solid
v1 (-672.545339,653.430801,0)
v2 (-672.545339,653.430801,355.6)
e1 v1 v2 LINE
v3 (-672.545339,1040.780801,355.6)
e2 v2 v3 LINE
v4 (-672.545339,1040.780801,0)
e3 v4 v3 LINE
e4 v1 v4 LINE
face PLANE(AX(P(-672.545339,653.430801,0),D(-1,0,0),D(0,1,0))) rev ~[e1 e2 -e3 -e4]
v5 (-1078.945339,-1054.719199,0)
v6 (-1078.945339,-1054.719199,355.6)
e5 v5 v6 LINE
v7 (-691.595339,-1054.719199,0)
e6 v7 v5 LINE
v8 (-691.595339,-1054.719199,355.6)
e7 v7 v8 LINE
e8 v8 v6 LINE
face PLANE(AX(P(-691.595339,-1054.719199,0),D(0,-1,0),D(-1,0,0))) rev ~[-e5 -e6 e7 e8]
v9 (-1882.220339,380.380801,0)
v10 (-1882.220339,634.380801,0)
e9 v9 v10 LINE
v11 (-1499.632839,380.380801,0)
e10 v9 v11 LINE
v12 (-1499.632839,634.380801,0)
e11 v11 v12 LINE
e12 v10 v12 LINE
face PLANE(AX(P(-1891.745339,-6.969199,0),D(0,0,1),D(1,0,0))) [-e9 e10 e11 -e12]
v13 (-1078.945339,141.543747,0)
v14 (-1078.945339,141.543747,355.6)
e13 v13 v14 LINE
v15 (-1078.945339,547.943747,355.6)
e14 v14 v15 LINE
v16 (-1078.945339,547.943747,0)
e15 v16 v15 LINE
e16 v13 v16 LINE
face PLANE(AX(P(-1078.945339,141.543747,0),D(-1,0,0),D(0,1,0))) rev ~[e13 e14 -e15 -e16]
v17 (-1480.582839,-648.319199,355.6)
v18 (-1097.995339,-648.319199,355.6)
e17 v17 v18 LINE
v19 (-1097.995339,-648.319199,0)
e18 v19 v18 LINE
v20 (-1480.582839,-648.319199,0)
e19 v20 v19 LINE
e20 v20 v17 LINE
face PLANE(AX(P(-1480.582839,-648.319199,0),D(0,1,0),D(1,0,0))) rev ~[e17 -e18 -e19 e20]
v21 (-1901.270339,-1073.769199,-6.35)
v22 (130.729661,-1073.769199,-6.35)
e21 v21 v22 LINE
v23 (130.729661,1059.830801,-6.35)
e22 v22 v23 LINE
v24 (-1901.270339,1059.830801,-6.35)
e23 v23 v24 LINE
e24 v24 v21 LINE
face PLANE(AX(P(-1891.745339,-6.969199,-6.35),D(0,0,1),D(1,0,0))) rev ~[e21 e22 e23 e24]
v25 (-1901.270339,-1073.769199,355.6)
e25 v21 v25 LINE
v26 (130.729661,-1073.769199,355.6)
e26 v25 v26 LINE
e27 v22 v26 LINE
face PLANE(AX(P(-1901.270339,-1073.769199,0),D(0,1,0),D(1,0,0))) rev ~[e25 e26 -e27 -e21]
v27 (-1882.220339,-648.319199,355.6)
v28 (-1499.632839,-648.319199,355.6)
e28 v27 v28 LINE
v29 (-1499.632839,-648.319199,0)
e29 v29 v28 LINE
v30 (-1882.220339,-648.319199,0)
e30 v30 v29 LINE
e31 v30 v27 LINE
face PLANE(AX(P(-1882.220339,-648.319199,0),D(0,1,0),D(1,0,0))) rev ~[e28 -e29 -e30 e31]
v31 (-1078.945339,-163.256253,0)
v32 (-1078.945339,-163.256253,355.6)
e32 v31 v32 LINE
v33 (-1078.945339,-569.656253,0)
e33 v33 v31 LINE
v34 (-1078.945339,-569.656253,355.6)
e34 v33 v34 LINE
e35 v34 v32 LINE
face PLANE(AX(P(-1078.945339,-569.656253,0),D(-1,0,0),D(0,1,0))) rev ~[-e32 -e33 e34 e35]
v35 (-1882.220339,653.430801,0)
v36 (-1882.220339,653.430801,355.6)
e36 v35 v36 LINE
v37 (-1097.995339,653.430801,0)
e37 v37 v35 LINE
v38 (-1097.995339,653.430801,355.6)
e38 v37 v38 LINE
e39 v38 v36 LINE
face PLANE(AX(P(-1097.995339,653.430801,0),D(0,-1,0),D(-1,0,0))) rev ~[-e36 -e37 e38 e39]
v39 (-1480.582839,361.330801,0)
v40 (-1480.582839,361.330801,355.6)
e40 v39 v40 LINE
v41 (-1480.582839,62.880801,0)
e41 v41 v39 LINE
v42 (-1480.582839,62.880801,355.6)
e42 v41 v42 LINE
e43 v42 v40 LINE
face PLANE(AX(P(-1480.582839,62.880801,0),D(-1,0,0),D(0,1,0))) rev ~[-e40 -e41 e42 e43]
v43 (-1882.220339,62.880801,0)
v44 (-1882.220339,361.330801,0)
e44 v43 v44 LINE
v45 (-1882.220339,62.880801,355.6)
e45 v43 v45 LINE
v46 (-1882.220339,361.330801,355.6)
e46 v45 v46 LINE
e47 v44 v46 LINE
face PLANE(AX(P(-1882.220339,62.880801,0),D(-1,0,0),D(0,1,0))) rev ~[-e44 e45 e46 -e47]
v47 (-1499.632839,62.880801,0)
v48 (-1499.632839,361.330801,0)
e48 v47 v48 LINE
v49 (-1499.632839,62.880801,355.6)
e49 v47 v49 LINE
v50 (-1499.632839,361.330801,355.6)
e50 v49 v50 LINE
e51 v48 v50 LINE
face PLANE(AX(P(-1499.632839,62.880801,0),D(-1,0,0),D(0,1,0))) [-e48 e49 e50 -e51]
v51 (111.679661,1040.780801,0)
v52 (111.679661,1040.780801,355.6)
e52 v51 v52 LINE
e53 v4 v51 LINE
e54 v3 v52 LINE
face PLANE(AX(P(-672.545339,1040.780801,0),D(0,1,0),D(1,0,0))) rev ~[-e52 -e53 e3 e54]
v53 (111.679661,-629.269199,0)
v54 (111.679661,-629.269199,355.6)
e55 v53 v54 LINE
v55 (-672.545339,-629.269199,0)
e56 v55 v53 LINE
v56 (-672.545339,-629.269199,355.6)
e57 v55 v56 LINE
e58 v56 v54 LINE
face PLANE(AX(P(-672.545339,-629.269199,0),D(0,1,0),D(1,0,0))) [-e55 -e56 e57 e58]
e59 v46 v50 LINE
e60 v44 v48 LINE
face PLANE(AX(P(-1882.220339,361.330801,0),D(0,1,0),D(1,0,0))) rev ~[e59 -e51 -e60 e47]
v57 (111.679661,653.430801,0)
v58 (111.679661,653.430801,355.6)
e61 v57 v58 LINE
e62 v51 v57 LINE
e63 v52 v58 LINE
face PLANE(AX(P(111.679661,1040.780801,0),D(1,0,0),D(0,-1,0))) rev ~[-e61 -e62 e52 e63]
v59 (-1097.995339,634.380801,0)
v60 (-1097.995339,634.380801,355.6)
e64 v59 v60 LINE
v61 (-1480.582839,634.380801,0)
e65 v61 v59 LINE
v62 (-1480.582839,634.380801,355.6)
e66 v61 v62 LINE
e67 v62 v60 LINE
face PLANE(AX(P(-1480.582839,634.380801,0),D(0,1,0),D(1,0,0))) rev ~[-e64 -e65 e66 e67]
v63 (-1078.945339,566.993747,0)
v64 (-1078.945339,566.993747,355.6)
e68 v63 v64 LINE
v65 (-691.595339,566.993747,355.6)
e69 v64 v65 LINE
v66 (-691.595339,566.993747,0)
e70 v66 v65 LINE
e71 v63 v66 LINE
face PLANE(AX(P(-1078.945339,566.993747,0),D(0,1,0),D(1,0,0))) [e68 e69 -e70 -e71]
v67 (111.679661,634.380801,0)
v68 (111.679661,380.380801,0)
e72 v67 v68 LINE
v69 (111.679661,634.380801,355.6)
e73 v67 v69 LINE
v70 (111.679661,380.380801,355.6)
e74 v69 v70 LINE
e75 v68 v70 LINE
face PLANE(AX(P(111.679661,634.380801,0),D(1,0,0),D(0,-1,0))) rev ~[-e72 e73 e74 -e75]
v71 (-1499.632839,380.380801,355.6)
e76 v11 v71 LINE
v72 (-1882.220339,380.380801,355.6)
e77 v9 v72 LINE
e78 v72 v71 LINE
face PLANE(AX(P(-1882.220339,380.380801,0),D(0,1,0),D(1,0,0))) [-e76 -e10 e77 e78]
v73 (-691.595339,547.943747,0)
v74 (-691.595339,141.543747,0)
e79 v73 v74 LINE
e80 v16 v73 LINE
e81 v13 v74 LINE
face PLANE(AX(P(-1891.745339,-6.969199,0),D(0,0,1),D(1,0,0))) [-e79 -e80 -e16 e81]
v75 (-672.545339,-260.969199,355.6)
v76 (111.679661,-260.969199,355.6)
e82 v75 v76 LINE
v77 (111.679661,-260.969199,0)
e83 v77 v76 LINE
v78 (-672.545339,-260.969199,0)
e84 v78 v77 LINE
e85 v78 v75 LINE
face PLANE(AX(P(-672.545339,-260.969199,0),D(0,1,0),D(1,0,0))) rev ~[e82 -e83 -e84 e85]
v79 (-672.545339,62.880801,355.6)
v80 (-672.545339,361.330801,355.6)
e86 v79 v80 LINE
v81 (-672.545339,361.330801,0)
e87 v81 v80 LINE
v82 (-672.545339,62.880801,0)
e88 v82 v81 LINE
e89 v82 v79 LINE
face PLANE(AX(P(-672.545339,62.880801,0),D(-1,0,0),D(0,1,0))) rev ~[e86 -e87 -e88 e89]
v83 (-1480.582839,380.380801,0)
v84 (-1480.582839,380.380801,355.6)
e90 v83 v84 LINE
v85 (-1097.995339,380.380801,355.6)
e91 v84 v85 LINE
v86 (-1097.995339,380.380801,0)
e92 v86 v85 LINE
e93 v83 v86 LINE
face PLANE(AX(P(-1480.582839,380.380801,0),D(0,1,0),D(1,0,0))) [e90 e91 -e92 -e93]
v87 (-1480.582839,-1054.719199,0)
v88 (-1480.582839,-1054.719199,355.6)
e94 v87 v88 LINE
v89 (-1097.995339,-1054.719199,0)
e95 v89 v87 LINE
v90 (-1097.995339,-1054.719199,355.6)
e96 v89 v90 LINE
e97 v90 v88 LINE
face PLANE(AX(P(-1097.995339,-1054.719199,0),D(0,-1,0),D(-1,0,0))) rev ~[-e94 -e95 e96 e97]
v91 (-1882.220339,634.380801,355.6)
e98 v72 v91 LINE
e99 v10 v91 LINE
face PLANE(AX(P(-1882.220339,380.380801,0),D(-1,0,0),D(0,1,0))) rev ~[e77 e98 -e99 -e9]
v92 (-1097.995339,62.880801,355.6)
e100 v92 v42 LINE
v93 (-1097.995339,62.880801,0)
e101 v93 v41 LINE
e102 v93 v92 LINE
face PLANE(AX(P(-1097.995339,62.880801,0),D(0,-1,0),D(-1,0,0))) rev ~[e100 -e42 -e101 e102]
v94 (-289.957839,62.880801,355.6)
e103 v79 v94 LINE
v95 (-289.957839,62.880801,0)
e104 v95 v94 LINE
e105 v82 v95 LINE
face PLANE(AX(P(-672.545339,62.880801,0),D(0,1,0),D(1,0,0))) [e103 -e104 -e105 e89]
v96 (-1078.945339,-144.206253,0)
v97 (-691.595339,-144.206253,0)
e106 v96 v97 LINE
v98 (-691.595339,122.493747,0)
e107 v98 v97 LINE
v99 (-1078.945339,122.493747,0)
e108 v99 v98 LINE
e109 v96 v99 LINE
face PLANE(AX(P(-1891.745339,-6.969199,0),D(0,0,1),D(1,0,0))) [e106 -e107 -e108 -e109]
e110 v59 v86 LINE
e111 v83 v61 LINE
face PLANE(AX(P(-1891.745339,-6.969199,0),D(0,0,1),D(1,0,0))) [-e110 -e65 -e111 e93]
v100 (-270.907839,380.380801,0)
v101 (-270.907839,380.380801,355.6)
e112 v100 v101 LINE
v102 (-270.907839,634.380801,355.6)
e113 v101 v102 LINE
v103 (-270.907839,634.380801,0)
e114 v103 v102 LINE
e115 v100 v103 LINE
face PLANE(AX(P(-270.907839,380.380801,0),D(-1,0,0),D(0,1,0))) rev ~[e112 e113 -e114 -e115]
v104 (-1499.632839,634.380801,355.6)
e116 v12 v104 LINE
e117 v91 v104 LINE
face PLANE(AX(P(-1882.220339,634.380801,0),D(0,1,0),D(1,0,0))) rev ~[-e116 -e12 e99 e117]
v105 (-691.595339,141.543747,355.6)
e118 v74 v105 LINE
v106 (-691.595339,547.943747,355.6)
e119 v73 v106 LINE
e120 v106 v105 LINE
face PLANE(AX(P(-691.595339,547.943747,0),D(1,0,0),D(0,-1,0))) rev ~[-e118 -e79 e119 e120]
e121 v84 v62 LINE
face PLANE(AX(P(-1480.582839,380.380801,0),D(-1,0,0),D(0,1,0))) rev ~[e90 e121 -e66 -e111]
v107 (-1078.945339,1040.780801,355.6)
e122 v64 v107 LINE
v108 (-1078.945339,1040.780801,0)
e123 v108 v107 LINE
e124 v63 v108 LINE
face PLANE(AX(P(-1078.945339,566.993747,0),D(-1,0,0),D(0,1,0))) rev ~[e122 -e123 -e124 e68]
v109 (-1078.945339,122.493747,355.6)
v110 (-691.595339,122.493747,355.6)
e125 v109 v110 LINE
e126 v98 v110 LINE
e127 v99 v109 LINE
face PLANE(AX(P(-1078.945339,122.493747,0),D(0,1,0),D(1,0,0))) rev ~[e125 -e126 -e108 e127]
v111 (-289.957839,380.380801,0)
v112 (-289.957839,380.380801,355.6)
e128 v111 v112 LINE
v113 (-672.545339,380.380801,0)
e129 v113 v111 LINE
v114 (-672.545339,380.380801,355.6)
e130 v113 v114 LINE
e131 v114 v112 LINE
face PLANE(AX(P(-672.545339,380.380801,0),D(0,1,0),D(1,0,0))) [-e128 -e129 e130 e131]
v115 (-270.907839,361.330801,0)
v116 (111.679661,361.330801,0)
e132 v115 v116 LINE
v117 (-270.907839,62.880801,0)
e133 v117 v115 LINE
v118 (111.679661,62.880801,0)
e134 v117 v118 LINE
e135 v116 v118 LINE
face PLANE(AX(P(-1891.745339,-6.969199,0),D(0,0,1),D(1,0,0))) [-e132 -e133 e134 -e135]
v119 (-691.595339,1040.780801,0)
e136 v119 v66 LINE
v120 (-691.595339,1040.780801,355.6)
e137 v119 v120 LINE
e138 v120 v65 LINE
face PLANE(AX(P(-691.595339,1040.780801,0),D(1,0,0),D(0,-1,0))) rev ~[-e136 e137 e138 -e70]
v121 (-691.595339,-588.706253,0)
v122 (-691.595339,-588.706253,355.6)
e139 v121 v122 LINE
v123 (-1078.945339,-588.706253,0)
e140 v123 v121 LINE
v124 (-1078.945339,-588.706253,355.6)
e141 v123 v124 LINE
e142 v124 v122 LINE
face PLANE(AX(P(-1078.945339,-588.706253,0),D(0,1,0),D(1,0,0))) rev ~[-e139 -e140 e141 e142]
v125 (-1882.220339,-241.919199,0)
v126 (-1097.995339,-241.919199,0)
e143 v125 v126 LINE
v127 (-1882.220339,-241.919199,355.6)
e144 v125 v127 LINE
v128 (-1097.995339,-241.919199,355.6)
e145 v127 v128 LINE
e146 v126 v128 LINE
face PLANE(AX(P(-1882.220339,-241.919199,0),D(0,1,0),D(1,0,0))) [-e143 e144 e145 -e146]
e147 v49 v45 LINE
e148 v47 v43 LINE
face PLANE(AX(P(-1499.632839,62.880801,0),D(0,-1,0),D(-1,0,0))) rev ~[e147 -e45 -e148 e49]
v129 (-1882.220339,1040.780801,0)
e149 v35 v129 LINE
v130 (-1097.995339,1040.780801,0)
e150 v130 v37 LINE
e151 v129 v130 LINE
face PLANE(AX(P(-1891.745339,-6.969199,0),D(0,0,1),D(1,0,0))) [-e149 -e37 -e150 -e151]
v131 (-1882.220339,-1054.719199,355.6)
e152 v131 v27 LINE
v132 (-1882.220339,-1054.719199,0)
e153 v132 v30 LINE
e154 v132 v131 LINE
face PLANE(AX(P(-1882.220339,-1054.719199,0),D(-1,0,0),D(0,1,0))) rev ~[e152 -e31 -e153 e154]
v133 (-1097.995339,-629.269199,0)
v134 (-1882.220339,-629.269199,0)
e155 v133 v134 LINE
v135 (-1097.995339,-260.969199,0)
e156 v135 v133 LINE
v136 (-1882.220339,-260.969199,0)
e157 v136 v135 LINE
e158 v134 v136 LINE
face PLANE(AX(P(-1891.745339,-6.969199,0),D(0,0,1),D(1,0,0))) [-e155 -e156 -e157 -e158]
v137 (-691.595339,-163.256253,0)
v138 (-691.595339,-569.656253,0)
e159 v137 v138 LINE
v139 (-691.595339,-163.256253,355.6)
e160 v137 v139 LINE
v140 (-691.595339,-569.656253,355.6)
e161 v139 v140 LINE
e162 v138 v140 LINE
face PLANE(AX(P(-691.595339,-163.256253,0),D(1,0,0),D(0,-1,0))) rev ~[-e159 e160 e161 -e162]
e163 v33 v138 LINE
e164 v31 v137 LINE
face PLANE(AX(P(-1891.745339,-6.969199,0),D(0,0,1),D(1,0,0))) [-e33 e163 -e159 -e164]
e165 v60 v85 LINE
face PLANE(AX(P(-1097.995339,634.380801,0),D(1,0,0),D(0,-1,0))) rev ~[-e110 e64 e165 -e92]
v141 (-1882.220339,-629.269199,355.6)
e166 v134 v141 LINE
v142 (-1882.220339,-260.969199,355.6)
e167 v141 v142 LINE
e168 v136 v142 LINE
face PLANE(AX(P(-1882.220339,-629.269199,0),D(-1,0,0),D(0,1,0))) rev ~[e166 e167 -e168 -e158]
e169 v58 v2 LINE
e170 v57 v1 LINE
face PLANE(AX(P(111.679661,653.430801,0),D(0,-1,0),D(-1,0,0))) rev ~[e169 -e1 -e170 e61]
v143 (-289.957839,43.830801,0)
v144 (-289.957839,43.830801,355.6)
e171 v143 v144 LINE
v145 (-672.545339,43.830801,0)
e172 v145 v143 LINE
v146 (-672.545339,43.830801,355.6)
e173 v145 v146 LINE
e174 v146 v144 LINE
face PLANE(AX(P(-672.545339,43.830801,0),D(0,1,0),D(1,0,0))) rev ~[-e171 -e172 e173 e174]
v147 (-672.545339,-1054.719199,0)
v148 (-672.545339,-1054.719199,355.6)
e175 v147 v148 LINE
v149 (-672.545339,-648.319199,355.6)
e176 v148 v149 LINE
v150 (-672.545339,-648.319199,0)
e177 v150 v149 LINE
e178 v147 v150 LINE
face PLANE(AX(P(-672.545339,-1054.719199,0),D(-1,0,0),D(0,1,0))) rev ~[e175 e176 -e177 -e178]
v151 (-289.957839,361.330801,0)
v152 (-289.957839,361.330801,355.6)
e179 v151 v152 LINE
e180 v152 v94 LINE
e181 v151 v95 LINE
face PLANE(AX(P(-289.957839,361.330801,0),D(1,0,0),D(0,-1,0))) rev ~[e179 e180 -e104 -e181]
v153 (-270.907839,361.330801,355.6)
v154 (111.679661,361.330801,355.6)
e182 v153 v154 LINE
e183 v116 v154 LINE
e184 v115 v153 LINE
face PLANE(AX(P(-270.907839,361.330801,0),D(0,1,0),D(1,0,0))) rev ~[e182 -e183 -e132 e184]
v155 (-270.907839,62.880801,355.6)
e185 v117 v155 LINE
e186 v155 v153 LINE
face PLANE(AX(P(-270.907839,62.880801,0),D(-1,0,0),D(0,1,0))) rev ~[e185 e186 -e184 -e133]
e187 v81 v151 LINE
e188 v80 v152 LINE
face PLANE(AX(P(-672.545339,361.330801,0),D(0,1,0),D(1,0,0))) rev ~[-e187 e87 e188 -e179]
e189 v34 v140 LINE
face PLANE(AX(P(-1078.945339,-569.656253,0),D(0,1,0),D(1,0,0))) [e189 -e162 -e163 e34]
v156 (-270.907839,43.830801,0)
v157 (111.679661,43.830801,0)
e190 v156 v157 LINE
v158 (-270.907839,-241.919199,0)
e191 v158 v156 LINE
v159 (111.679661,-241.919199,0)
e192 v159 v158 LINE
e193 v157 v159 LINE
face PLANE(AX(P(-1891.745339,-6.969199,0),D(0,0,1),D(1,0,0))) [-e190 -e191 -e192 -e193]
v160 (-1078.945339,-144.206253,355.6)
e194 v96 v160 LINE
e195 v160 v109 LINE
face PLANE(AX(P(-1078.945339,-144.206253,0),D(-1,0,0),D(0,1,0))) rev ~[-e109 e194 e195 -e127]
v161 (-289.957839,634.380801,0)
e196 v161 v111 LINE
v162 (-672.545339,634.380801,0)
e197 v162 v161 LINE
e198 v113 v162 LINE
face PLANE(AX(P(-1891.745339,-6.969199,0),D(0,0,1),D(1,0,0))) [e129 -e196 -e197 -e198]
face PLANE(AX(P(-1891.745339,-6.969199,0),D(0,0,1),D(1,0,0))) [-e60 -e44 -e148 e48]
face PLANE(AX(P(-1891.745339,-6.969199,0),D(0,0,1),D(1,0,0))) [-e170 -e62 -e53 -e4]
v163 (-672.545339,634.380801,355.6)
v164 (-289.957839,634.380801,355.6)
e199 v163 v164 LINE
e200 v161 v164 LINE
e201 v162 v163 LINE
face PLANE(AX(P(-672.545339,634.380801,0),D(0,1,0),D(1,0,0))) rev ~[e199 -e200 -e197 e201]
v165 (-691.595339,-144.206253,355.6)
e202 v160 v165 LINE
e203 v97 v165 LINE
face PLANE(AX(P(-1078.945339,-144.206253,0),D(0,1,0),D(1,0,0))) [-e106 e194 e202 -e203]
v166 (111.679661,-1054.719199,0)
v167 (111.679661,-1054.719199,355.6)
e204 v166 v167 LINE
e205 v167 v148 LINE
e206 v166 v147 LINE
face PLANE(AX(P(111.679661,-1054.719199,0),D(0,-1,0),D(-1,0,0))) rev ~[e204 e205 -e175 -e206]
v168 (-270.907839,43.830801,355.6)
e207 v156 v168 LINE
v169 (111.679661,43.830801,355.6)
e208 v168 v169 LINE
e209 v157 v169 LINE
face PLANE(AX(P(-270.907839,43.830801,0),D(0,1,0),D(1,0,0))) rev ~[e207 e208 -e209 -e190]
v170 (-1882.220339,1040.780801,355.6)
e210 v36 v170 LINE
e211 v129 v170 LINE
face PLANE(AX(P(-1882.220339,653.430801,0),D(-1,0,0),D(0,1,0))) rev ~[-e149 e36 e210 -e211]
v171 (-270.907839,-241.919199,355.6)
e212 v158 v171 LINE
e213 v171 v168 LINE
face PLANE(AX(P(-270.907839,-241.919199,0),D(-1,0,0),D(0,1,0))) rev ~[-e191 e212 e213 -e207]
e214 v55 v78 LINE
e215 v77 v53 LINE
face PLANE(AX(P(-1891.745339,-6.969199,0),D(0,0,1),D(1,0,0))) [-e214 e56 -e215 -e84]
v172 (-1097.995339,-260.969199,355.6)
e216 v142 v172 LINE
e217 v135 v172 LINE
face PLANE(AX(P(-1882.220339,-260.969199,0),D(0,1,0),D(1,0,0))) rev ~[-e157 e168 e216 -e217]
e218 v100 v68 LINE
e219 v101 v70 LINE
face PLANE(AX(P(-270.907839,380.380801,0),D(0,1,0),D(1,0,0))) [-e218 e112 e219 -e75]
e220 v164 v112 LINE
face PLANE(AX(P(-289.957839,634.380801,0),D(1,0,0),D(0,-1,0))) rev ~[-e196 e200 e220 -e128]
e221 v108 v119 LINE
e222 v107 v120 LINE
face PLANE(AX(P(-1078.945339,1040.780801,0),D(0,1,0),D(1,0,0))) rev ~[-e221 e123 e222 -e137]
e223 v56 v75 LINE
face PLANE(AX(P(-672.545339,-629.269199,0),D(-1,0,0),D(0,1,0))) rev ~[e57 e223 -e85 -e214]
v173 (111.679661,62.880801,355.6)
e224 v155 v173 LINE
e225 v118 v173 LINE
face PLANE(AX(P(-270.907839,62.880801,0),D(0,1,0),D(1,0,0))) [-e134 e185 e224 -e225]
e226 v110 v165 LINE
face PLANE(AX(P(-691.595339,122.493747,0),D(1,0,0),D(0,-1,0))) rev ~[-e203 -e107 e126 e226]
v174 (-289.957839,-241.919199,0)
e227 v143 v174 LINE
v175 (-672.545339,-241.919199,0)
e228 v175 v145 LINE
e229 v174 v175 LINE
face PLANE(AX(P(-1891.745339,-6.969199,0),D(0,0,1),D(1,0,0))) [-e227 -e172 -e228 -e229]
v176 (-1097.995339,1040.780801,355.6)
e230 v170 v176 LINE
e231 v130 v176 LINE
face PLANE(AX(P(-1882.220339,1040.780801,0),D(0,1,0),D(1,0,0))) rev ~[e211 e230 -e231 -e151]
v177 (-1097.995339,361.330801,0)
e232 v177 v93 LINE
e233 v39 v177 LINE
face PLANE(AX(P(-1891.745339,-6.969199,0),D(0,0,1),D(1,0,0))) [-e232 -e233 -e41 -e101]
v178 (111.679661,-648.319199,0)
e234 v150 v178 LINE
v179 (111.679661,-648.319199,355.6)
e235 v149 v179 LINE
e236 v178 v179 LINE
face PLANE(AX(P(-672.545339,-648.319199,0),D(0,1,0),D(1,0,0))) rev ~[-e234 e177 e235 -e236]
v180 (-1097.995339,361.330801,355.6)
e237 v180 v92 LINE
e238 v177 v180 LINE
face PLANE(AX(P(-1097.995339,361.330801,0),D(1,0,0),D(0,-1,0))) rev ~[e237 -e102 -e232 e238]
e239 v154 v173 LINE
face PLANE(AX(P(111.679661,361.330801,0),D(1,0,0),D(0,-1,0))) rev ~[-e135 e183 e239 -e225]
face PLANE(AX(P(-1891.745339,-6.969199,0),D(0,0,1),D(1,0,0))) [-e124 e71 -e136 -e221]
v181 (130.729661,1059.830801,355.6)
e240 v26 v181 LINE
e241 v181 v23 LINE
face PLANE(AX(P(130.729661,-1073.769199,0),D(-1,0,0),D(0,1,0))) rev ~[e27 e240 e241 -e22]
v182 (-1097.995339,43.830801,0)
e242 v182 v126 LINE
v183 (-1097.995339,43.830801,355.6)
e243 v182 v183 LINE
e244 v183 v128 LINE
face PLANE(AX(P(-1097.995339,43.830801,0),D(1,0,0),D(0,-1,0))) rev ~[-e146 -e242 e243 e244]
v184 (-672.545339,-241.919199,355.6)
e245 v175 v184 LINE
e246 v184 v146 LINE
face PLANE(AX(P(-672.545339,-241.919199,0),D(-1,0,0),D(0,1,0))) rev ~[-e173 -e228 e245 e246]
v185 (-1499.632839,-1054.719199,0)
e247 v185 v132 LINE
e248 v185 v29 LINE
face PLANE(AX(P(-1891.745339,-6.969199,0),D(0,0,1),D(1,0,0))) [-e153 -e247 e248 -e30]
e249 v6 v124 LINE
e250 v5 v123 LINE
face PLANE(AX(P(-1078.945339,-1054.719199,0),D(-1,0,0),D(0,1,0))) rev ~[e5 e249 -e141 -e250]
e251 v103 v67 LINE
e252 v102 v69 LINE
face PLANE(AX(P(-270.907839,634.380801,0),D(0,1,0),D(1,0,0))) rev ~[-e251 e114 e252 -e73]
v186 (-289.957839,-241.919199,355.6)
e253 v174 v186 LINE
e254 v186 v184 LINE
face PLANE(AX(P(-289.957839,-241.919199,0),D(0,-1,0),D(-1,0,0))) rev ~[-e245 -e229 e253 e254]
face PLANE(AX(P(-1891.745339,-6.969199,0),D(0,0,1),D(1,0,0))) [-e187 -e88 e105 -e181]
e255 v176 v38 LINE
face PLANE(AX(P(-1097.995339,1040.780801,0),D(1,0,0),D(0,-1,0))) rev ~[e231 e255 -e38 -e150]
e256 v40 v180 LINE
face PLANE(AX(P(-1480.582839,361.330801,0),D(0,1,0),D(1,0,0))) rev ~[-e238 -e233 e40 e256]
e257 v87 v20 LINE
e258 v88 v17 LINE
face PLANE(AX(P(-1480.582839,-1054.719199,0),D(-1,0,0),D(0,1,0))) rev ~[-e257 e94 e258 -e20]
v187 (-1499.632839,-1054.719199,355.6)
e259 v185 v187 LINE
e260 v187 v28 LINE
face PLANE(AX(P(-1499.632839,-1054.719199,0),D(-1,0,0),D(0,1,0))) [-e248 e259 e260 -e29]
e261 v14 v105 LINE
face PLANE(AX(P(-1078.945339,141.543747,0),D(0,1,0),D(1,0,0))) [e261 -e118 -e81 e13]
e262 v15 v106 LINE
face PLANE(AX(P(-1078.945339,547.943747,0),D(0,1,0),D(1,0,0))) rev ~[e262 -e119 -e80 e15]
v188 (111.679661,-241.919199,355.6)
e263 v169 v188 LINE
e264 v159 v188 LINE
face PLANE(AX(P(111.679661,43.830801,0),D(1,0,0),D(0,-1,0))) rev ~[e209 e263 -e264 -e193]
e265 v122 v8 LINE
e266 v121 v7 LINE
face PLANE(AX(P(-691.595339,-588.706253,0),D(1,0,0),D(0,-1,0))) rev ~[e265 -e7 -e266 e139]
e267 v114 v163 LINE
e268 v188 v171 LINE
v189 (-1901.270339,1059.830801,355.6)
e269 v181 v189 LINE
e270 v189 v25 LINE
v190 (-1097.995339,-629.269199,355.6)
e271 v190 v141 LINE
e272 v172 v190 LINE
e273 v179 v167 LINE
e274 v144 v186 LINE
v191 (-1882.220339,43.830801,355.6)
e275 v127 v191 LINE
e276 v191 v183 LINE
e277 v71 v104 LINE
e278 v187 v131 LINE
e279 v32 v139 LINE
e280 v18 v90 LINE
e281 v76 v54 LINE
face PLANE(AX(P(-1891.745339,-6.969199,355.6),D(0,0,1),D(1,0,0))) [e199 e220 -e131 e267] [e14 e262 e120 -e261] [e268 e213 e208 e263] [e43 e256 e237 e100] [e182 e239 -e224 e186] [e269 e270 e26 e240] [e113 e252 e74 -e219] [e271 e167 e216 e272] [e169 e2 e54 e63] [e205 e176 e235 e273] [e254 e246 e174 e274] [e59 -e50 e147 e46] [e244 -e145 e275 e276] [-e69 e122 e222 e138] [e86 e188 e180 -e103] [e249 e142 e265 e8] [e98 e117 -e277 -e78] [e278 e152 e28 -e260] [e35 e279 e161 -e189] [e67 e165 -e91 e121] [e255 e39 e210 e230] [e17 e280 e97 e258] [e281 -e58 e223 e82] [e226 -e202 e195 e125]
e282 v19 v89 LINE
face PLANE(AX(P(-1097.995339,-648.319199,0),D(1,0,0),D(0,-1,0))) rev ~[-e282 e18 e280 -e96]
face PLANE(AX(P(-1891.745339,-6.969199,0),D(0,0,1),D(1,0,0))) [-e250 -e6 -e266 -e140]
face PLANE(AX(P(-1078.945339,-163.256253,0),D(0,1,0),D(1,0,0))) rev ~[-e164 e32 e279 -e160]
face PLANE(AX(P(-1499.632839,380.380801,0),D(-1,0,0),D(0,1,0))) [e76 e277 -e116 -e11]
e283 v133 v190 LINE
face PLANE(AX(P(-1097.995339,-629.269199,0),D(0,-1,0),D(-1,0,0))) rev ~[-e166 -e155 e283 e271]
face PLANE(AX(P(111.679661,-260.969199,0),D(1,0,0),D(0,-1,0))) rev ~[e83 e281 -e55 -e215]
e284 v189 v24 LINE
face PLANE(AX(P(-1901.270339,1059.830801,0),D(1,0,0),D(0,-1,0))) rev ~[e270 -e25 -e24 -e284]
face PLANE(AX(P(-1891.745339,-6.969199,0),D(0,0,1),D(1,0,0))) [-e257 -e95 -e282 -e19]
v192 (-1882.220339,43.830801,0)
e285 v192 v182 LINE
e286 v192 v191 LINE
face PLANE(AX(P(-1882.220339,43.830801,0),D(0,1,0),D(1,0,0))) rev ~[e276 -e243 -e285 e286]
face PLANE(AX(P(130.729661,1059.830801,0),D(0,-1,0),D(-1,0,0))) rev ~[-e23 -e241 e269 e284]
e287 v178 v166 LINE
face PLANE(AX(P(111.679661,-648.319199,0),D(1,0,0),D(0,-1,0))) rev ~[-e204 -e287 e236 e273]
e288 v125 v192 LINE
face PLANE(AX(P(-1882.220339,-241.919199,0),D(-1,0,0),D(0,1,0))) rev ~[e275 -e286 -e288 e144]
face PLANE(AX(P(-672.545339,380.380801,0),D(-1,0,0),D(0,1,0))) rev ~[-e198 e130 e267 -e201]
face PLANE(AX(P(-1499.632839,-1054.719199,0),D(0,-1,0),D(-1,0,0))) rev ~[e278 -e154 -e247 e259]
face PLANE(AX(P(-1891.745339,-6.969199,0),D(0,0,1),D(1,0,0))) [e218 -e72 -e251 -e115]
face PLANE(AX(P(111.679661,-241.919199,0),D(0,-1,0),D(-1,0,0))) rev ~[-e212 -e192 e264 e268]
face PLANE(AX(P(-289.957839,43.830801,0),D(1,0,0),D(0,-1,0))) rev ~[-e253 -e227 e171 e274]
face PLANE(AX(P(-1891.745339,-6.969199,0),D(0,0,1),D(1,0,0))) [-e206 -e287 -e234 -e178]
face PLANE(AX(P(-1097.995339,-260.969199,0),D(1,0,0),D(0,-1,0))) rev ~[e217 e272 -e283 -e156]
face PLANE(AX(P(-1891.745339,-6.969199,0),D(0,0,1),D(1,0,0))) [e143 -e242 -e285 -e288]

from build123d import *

# Parameters (mm, degrees)
F0_W     = 784.225
F0_H     = 387.35
F0_W_2   = 382.5875
F0_H_2   = 406.4
F0_H_3   = 254
F0_W_3   = 387.35
F0_H_4   = 473.7870542765
F0_W_4   = 19.05
F0_H_5   = 19.05
F0_H_6   = 368.3
F0_H_7   = 298.45
F0_H_8   = 466.0129457235
F0_H_9   = 285.75
F0_H_10  = 266.7
F1_DEPTH = 6.35
F2_DEPTH = 355.6


with BuildPart() as f1:
    # F0 (on Top) → F1 (new body)
    with BuildSketch(Plane.XY):
        Polygon((-1882.2203393722, 1059.8308014154), (-1901.2703393722, 1059.8308014154), (-1901.2703393722, -1073.7691985846), (-1882.2203393722, -1073.7691985846), (-1882.2203393722, -1054.7191985846), (-1882.2203393722, -648.3191985846), (-1882.2203393722, -629.2691985846), (-1882.2203393722, -260.9691985846), (-1882.2203393722, -241.9191985846), (-1882.2203393722, 43.8308014154), (-1882.2203393722, 62.8808014154), (-1882.2203393722, 361.3308014154), (-1882.2203393722, 380.3808014154), (-1882.2203393722, 634.3808014154), (-1882.2203393722, 653.4308014154), (-1882.2203393722, 1040.7808014154), align=None)
        Polygon((-682.0703393722, 1059.8308014154), (-1882.2203393722, 1059.8308014154), (-1882.2203393722, 1040.7808014154), (-1097.9953393722, 1040.7808014154), (-1078.9453393722, 1040.7808014154), (-691.5953393722, 1040.7808014154), (-672.5453393722, 1040.7808014154), (111.6796606278, 1040.7808014154), (111.6796606278, 1059.8308014154), align=None)
        with Locations((-1490.1078393722, 847.1058014154)):
            Rectangle(F0_W, F0_H)
        Polygon((-1882.2203393722, -1054.7191985846), (-1882.2203393722, -1073.7691985846), (111.6796606278, -1073.7691985846), (111.6796606278, -1054.7191985846), (-672.5453393722, -1054.7191985846), (-691.5953393722, -1054.7191985846), (-1078.9453393722, -1054.7191985846), (-1097.9953393722, -1054.7191985846), (-1480.5828393722, -1054.7191985846), (-1499.6328393722, -1054.7191985846), align=None)
        Polygon((130.7296606278, 1059.8308014154), (111.6796606278, 1059.8308014154), (111.6796606278, 1040.7808014154), (111.6796606278, 653.4308014154), (111.6796606278, 634.3808014154), (111.6796606278, 380.3808014154), (111.6796606278, 361.3308014154), (111.6796606278, 62.8808014154), (111.6796606278, 43.8308014154), (111.6796606278, -241.9191985846), (111.6796606278, -260.9691985846), (111.6796606278, -629.2691985846), (111.6796606278, -648.3191985846), (111.6796606278, -1054.7191985846), (111.6796606278, -1073.7691985846), (130.7296606278, -1073.7691985846), align=None)
        Polygon((-1097.9953393722, 653.4308014154), (-1882.2203393722, 653.4308014154), (-1882.2203393722, 634.3808014154), (-1499.6328393722, 634.3808014154), (-1480.5828393722, 634.3808014154), (-1097.9953393722, 634.3808014154), align=None)
        Polygon((-1078.9453393722, 1040.7808014154), (-1097.9953393722, 1040.7808014154), (-1097.9953393722, 653.4308014154), (-1097.9953393722, 634.3808014154), (-1097.9953393722, 380.3808014154), (-1097.9953393722, 361.3308014154), (-1097.9953393722, 62.8808014154), (-1097.9953393722, 43.8308014154), (-1097.9953393722, -241.9191985846), (-1097.9953393722, -260.9691985846), (-1097.9953393722, -629.2691985846), (-1097.9953393722, -648.3191985846), (-1097.9953393722, -1054.7191985846), (-1078.9453393722, -1054.7191985846), (-1078.9453393722, -588.706252861), (-1078.9453393722, -569.656252861), (-1078.9453393722, -163.256252861), (-1078.9453393722, -144.206252861), (-1078.9453393722, 122.493747139), (-1078.9453393722, 141.543747139), (-1078.9453393722, 547.943747139), (-1078.9453393722, 566.993747139), align=None)
        with Locations((-1690.9265893722, -851.5191985846)):
            Rectangle(F0_W_2, F0_H_2)
        with Locations((-280.4328393722, 847.1058014154)):
            Rectangle(F0_W, F0_H)
        with Locations((-1690.9265893722, 507.3808014154)):
            Rectangle(F0_W_2, F0_H_3)
        with Locations((-885.2703393722, 803.8872742772)):
            Rectangle(F0_W_3, F0_H_4)
        with Locations((-280.4328393722, -851.5191985846)):
            Rectangle(F0_W, F0_H_2)
        Polygon((-1882.2203393722, -629.2691985846), (-1882.2203393722, -648.3191985846), (-1499.6328393722, -648.3191985846), (-1480.5828393722, -648.3191985846), (-1097.9953393722, -648.3191985846), (-1097.9953393722, -629.2691985846), align=None)
        with Locations((-1490.1078393722, -851.5191985846)):
            Rectangle(F0_W_4, F0_H_2)
        Polygon((111.6796606278, 634.3808014154), (111.6796606278, 653.4308014154), (-672.5453393722, 653.4308014154), (-672.5453393722, 634.3808014154), (-289.9578393722, 634.3808014154), (-270.9078393722, 634.3808014154), align=None)
        Polygon((-672.5453393722, 653.4308014154), (-672.5453393722, 1040.7808014154), (-691.5953393722, 1040.7808014154), (-691.5953393722, 566.993747139), (-691.5953393722, 547.943747139), (-691.5953393722, 141.543747139), (-691.5953393722, 122.493747139), (-691.5953393722, -144.206252861), (-691.5953393722, -163.256252861), (-691.5953393722, -569.656252861), (-691.5953393722, -588.706252861), (-691.5953393722, -1054.7191985846), (-672.5453393722, -1054.7191985846), (-672.5453393722, -648.3191985846), (-672.5453393722, -629.2691985846), (-672.5453393722, -260.9691985846), (-672.5453393722, -241.9191985846), (-672.5453393722, 43.8308014154), (-672.5453393722, 62.8808014154), (-672.5453393722, 361.3308014154), (-672.5453393722, 380.3808014154), (-672.5453393722, 634.3808014154), align=None)
        with Locations((-1690.9265893722, 370.8558014154)):
            Rectangle(F0_W_2, F0_H_5)
        with Locations((-1490.1078393722, 507.3808014154)):
            Rectangle(F0_W_4, F0_H_3)
        with Locations((-1289.2890893722, 507.3808014154)):
            Rectangle(F0_W_2, F0_H_3)
        with Locations((-885.2703393722, 557.468747139)):
            Rectangle(F0_W_3, F0_H_5)
        with Locations((-280.4328393722, -638.7941985846)):
            Rectangle(F0_W, F0_H_5)
        with Locations((-1490.1078393722, -445.1191985846)):
            Rectangle(F0_W, F0_H_6)
        with Locations((-1289.2890893722, -851.5191985846)):
            Rectangle(F0_W_2, F0_H_2)
        with Locations((-79.6140893722, 507.3808014154)):
            Rectangle(F0_W_2, F0_H_3)
        with Locations((-1690.9265893722, 212.1058014154)):
            Rectangle(F0_W_2, F0_H_7)
        with Locations((-1490.1078393722, 370.8558014154)):
            Rectangle(F0_W_4, F0_H_5)
        with Locations((-1289.2890893722, 370.8558014154)):
            Rectangle(F0_W_2, F0_H_5)
        with Locations((-885.2703393722, 344.743747139)):
            Rectangle(F0_W_3, F0_H_2)
        with Locations((-280.4328393722, -445.1191985846)):
            Rectangle(F0_W, F0_H_6)
        with Locations((-885.2703393722, -821.7127257228)):
            Rectangle(F0_W_3, F0_H_8)
        with Locations((-1490.1078393722, -251.4441985846)):
            Rectangle(F0_W, F0_H_5)
        with Locations((-79.6140893722, 370.8558014154)):
            Rectangle(F0_W_2, F0_H_5)
        with Locations((-280.4328393722, 507.3808014154)):
            Rectangle(F0_W_4, F0_H_3)
        with Locations((-481.2515893722, 507.3808014154)):
            Rectangle(F0_W_2, F0_H_3)
        Polygon((-1499.6328393722, 62.8808014154), (-1882.2203393722, 62.8808014154), (-1882.2203393722, 43.8308014154), (-1097.9953393722, 43.8308014154), (-1097.9953393722, 62.8808014154), (-1480.5828393722, 62.8808014154), align=None)
        with Locations((-1490.1078393722, 212.1058014154)):
            Rectangle(F0_W_4, F0_H_7)
        with Locations((-1289.2890893722, 212.1058014154)):
            Rectangle(F0_W_2, F0_H_7)
        with Locations((-885.2703393722, 132.018747139)):
            Rectangle(F0_W_3, F0_H_5)
        Polygon((-672.5453393722, -260.9691985846), (111.6796606278, -260.9691985846), (111.6796606278, -241.9191985846), (-270.9078393722, -241.9191985846), (-289.9578393722, -241.9191985846), (-672.5453393722, -241.9191985846), align=None)
        with Locations((-885.2703393722, -579.181252861)):
            Rectangle(F0_W_3, F0_H_5)
        with Locations((-1490.1078393722, -99.0441985846)):
            Rectangle(F0_W, F0_H_9)
        with Locations((-79.6140893722, 212.1058014154)):
            Rectangle(F0_W_2, F0_H_7)
        with Locations((-280.4328393722, 370.8558014154)):
            Rectangle(F0_W_4, F0_H_5)
        with Locations((-481.2515893722, 370.8558014154)):
            Rectangle(F0_W_2, F0_H_5)
        with Locations((-885.2703393722, -10.856252861)):
            Rectangle(F0_W_3, F0_H_10)
        with Locations((-79.6140893722, -99.0441985846)):
            Rectangle(F0_W_2, F0_H_9)
        with Locations((-885.2703393722, -366.456252861)):
            Rectangle(F0_W_3, F0_H_2)
        with Locations((-79.6140893722, 53.3558014154)):
            Rectangle(F0_W_2, F0_H_5)
        with Locations((-280.4328393722, 212.1058014154)):
            Rectangle(F0_W_4, F0_H_7)
        with Locations((-481.2515893722, 212.1058014154)):
            Rectangle(F0_W_2, F0_H_7)
        with Locations((-885.2703393722, -153.731252861)):
            Rectangle(F0_W_3, F0_H_5)
        with Locations((-280.4328393722, -99.0441985846)):
            Rectangle(F0_W_4, F0_H_9)
        with Locations((-481.2515893722, -99.0441985846)):
            Rectangle(F0_W_2, F0_H_9)
        with Locations((-280.4328393722, 53.3558014154)):
            Rectangle(F0_W_4, F0_H_5)
        with Locations((-481.2515893722, 53.3558014154)):
            Rectangle(F0_W_2, F0_H_5)
    extrude(amount=-F1_DEPTH)

    # F0 (on Top) → F2 (join)
    with BuildSketch(Plane.XY):
        Polygon((-1882.2203393722, 1059.8308014154), (-1901.2703393722, 1059.8308014154), (-1901.2703393722, -1073.7691985846), (-1882.2203393722, -1073.7691985846), (-1882.2203393722, -1054.7191985846), (-1882.2203393722, -648.3191985846), (-1882.2203393722, -629.2691985846), (-1882.2203393722, -260.9691985846), (-1882.2203393722, -241.9191985846), (-1882.2203393722, 43.8308014154), (-1882.2203393722, 62.8808014154), (-1882.2203393722, 361.3308014154), (-1882.2203393722, 380.3808014154), (-1882.2203393722, 634.3808014154), (-1882.2203393722, 653.4308014154), (-1882.2203393722, 1040.7808014154), align=None)
        Polygon((-682.0703393722, 1059.8308014154), (-1882.2203393722, 1059.8308014154), (-1882.2203393722, 1040.7808014154), (-1097.9953393722, 1040.7808014154), (-1078.9453393722, 1040.7808014154), (-691.5953393722, 1040.7808014154), (-672.5453393722, 1040.7808014154), (111.6796606278, 1040.7808014154), (111.6796606278, 1059.8308014154), align=None)
        Polygon((-1882.2203393722, -1054.7191985846), (-1882.2203393722, -1073.7691985846), (111.6796606278, -1073.7691985846), (111.6796606278, -1054.7191985846), (-672.5453393722, -1054.7191985846), (-691.5953393722, -1054.7191985846), (-1078.9453393722, -1054.7191985846), (-1097.9953393722, -1054.7191985846), (-1480.5828393722, -1054.7191985846), (-1499.6328393722, -1054.7191985846), align=None)
        Polygon((130.7296606278, 1059.8308014154), (111.6796606278, 1059.8308014154), (111.6796606278, 1040.7808014154), (111.6796606278, 653.4308014154), (111.6796606278, 634.3808014154), (111.6796606278, 380.3808014154), (111.6796606278, 361.3308014154), (111.6796606278, 62.8808014154), (111.6796606278, 43.8308014154), (111.6796606278, -241.9191985846), (111.6796606278, -260.9691985846), (111.6796606278, -629.2691985846), (111.6796606278, -648.3191985846), (111.6796606278, -1054.7191985846), (111.6796606278, -1073.7691985846), (130.7296606278, -1073.7691985846), align=None)
        Polygon((-1097.9953393722, 653.4308014154), (-1882.2203393722, 653.4308014154), (-1882.2203393722, 634.3808014154), (-1499.6328393722, 634.3808014154), (-1480.5828393722, 634.3808014154), (-1097.9953393722, 634.3808014154), align=None)
        Polygon((-1078.9453393722, 1040.7808014154), (-1097.9953393722, 1040.7808014154), (-1097.9953393722, 653.4308014154), (-1097.9953393722, 634.3808014154), (-1097.9953393722, 380.3808014154), (-1097.9953393722, 361.3308014154), (-1097.9953393722, 62.8808014154), (-1097.9953393722, 43.8308014154), (-1097.9953393722, -241.9191985846), (-1097.9953393722, -260.9691985846), (-1097.9953393722, -629.2691985846), (-1097.9953393722, -648.3191985846), (-1097.9953393722, -1054.7191985846), (-1078.9453393722, -1054.7191985846), (-1078.9453393722, -588.706252861), (-1078.9453393722, -569.656252861), (-1078.9453393722, -163.256252861), (-1078.9453393722, -144.206252861), (-1078.9453393722, 122.493747139), (-1078.9453393722, 141.543747139), (-1078.9453393722, 547.943747139), (-1078.9453393722, 566.993747139), align=None)
        Polygon((-1882.2203393722, -629.2691985846), (-1882.2203393722, -648.3191985846), (-1499.6328393722, -648.3191985846), (-1480.5828393722, -648.3191985846), (-1097.9953393722, -648.3191985846), (-1097.9953393722, -629.2691985846), align=None)
        with Locations((-1490.1078393722, -851.5191985846)):
            Rectangle(F0_W_4, F0_H_2)
        Polygon((111.6796606278, 634.3808014154), (111.6796606278, 653.4308014154), (-672.5453393722, 653.4308014154), (-672.5453393722, 634.3808014154), (-289.9578393722, 634.3808014154), (-270.9078393722, 634.3808014154), align=None)
        Polygon((-672.5453393722, 653.4308014154), (-672.5453393722, 1040.7808014154), (-691.5953393722, 1040.7808014154), (-691.5953393722, 566.993747139), (-691.5953393722, 547.943747139), (-691.5953393722, 141.543747139), (-691.5953393722, 122.493747139), (-691.5953393722, -144.206252861), (-691.5953393722, -163.256252861), (-691.5953393722, -569.656252861), (-691.5953393722, -588.706252861), (-691.5953393722, -1054.7191985846), (-672.5453393722, -1054.7191985846), (-672.5453393722, -648.3191985846), (-672.5453393722, -629.2691985846), (-672.5453393722, -260.9691985846), (-672.5453393722, -241.9191985846), (-672.5453393722, 43.8308014154), (-672.5453393722, 62.8808014154), (-672.5453393722, 361.3308014154), (-672.5453393722, 380.3808014154), (-672.5453393722, 634.3808014154), align=None)
        with Locations((-1690.9265893722, 370.8558014154)):
            Rectangle(F0_W_2, F0_H_5)
        with Locations((-1490.1078393722, 507.3808014154)):
            Rectangle(F0_W_4, F0_H_3)
        with Locations((-885.2703393722, 557.468747139)):
            Rectangle(F0_W_3, F0_H_5)
        with Locations((-280.4328393722, -638.7941985846)):
            Rectangle(F0_W, F0_H_5)
        with Locations((-1490.1078393722, 370.8558014154)):
            Rectangle(F0_W_4, F0_H_5)
        with Locations((-1289.2890893722, 370.8558014154)):
            Rectangle(F0_W_2, F0_H_5)
        with Locations((-1490.1078393722, -251.4441985846)):
            Rectangle(F0_W, F0_H_5)
        with Locations((-79.6140893722, 370.8558014154)):
            Rectangle(F0_W_2, F0_H_5)
        with Locations((-280.4328393722, 507.3808014154)):
            Rectangle(F0_W_4, F0_H_3)
        Polygon((-1499.6328393722, 62.8808014154), (-1882.2203393722, 62.8808014154), (-1882.2203393722, 43.8308014154), (-1097.9953393722, 43.8308014154), (-1097.9953393722, 62.8808014154), (-1480.5828393722, 62.8808014154), align=None)
        with Locations((-1490.1078393722, 212.1058014154)):
            Rectangle(F0_W_4, F0_H_7)
        with Locations((-885.2703393722, 132.018747139)):
            Rectangle(F0_W_3, F0_H_5)
        Polygon((-672.5453393722, -260.9691985846), (111.6796606278, -260.9691985846), (111.6796606278, -241.9191985846), (-270.9078393722, -241.9191985846), (-289.9578393722, -241.9191985846), (-672.5453393722, -241.9191985846), align=None)
        with Locations((-885.2703393722, -579.181252861)):
            Rectangle(F0_W_3, F0_H_5)
        with Locations((-280.4328393722, 370.8558014154)):
            Rectangle(F0_W_4, F0_H_5)
        with Locations((-481.2515893722, 370.8558014154)):
            Rectangle(F0_W_2, F0_H_5)
        with Locations((-79.6140893722, 53.3558014154)):
            Rectangle(F0_W_2, F0_H_5)
        with Locations((-280.4328393722, 212.1058014154)):
            Rectangle(F0_W_4, F0_H_7)
        with Locations((-885.2703393722, -153.731252861)):
            Rectangle(F0_W_3, F0_H_5)
        with Locations((-280.4328393722, -99.0441985846)):
            Rectangle(F0_W_4, F0_H_9)
        with Locations((-280.4328393722, 53.3558014154)):
            Rectangle(F0_W_4, F0_H_5)
        with Locations((-481.2515893722, 53.3558014154)):
            Rectangle(F0_W_2, F0_H_5)
    extrude(amount=F2_DEPTH)


solid = f1.part
